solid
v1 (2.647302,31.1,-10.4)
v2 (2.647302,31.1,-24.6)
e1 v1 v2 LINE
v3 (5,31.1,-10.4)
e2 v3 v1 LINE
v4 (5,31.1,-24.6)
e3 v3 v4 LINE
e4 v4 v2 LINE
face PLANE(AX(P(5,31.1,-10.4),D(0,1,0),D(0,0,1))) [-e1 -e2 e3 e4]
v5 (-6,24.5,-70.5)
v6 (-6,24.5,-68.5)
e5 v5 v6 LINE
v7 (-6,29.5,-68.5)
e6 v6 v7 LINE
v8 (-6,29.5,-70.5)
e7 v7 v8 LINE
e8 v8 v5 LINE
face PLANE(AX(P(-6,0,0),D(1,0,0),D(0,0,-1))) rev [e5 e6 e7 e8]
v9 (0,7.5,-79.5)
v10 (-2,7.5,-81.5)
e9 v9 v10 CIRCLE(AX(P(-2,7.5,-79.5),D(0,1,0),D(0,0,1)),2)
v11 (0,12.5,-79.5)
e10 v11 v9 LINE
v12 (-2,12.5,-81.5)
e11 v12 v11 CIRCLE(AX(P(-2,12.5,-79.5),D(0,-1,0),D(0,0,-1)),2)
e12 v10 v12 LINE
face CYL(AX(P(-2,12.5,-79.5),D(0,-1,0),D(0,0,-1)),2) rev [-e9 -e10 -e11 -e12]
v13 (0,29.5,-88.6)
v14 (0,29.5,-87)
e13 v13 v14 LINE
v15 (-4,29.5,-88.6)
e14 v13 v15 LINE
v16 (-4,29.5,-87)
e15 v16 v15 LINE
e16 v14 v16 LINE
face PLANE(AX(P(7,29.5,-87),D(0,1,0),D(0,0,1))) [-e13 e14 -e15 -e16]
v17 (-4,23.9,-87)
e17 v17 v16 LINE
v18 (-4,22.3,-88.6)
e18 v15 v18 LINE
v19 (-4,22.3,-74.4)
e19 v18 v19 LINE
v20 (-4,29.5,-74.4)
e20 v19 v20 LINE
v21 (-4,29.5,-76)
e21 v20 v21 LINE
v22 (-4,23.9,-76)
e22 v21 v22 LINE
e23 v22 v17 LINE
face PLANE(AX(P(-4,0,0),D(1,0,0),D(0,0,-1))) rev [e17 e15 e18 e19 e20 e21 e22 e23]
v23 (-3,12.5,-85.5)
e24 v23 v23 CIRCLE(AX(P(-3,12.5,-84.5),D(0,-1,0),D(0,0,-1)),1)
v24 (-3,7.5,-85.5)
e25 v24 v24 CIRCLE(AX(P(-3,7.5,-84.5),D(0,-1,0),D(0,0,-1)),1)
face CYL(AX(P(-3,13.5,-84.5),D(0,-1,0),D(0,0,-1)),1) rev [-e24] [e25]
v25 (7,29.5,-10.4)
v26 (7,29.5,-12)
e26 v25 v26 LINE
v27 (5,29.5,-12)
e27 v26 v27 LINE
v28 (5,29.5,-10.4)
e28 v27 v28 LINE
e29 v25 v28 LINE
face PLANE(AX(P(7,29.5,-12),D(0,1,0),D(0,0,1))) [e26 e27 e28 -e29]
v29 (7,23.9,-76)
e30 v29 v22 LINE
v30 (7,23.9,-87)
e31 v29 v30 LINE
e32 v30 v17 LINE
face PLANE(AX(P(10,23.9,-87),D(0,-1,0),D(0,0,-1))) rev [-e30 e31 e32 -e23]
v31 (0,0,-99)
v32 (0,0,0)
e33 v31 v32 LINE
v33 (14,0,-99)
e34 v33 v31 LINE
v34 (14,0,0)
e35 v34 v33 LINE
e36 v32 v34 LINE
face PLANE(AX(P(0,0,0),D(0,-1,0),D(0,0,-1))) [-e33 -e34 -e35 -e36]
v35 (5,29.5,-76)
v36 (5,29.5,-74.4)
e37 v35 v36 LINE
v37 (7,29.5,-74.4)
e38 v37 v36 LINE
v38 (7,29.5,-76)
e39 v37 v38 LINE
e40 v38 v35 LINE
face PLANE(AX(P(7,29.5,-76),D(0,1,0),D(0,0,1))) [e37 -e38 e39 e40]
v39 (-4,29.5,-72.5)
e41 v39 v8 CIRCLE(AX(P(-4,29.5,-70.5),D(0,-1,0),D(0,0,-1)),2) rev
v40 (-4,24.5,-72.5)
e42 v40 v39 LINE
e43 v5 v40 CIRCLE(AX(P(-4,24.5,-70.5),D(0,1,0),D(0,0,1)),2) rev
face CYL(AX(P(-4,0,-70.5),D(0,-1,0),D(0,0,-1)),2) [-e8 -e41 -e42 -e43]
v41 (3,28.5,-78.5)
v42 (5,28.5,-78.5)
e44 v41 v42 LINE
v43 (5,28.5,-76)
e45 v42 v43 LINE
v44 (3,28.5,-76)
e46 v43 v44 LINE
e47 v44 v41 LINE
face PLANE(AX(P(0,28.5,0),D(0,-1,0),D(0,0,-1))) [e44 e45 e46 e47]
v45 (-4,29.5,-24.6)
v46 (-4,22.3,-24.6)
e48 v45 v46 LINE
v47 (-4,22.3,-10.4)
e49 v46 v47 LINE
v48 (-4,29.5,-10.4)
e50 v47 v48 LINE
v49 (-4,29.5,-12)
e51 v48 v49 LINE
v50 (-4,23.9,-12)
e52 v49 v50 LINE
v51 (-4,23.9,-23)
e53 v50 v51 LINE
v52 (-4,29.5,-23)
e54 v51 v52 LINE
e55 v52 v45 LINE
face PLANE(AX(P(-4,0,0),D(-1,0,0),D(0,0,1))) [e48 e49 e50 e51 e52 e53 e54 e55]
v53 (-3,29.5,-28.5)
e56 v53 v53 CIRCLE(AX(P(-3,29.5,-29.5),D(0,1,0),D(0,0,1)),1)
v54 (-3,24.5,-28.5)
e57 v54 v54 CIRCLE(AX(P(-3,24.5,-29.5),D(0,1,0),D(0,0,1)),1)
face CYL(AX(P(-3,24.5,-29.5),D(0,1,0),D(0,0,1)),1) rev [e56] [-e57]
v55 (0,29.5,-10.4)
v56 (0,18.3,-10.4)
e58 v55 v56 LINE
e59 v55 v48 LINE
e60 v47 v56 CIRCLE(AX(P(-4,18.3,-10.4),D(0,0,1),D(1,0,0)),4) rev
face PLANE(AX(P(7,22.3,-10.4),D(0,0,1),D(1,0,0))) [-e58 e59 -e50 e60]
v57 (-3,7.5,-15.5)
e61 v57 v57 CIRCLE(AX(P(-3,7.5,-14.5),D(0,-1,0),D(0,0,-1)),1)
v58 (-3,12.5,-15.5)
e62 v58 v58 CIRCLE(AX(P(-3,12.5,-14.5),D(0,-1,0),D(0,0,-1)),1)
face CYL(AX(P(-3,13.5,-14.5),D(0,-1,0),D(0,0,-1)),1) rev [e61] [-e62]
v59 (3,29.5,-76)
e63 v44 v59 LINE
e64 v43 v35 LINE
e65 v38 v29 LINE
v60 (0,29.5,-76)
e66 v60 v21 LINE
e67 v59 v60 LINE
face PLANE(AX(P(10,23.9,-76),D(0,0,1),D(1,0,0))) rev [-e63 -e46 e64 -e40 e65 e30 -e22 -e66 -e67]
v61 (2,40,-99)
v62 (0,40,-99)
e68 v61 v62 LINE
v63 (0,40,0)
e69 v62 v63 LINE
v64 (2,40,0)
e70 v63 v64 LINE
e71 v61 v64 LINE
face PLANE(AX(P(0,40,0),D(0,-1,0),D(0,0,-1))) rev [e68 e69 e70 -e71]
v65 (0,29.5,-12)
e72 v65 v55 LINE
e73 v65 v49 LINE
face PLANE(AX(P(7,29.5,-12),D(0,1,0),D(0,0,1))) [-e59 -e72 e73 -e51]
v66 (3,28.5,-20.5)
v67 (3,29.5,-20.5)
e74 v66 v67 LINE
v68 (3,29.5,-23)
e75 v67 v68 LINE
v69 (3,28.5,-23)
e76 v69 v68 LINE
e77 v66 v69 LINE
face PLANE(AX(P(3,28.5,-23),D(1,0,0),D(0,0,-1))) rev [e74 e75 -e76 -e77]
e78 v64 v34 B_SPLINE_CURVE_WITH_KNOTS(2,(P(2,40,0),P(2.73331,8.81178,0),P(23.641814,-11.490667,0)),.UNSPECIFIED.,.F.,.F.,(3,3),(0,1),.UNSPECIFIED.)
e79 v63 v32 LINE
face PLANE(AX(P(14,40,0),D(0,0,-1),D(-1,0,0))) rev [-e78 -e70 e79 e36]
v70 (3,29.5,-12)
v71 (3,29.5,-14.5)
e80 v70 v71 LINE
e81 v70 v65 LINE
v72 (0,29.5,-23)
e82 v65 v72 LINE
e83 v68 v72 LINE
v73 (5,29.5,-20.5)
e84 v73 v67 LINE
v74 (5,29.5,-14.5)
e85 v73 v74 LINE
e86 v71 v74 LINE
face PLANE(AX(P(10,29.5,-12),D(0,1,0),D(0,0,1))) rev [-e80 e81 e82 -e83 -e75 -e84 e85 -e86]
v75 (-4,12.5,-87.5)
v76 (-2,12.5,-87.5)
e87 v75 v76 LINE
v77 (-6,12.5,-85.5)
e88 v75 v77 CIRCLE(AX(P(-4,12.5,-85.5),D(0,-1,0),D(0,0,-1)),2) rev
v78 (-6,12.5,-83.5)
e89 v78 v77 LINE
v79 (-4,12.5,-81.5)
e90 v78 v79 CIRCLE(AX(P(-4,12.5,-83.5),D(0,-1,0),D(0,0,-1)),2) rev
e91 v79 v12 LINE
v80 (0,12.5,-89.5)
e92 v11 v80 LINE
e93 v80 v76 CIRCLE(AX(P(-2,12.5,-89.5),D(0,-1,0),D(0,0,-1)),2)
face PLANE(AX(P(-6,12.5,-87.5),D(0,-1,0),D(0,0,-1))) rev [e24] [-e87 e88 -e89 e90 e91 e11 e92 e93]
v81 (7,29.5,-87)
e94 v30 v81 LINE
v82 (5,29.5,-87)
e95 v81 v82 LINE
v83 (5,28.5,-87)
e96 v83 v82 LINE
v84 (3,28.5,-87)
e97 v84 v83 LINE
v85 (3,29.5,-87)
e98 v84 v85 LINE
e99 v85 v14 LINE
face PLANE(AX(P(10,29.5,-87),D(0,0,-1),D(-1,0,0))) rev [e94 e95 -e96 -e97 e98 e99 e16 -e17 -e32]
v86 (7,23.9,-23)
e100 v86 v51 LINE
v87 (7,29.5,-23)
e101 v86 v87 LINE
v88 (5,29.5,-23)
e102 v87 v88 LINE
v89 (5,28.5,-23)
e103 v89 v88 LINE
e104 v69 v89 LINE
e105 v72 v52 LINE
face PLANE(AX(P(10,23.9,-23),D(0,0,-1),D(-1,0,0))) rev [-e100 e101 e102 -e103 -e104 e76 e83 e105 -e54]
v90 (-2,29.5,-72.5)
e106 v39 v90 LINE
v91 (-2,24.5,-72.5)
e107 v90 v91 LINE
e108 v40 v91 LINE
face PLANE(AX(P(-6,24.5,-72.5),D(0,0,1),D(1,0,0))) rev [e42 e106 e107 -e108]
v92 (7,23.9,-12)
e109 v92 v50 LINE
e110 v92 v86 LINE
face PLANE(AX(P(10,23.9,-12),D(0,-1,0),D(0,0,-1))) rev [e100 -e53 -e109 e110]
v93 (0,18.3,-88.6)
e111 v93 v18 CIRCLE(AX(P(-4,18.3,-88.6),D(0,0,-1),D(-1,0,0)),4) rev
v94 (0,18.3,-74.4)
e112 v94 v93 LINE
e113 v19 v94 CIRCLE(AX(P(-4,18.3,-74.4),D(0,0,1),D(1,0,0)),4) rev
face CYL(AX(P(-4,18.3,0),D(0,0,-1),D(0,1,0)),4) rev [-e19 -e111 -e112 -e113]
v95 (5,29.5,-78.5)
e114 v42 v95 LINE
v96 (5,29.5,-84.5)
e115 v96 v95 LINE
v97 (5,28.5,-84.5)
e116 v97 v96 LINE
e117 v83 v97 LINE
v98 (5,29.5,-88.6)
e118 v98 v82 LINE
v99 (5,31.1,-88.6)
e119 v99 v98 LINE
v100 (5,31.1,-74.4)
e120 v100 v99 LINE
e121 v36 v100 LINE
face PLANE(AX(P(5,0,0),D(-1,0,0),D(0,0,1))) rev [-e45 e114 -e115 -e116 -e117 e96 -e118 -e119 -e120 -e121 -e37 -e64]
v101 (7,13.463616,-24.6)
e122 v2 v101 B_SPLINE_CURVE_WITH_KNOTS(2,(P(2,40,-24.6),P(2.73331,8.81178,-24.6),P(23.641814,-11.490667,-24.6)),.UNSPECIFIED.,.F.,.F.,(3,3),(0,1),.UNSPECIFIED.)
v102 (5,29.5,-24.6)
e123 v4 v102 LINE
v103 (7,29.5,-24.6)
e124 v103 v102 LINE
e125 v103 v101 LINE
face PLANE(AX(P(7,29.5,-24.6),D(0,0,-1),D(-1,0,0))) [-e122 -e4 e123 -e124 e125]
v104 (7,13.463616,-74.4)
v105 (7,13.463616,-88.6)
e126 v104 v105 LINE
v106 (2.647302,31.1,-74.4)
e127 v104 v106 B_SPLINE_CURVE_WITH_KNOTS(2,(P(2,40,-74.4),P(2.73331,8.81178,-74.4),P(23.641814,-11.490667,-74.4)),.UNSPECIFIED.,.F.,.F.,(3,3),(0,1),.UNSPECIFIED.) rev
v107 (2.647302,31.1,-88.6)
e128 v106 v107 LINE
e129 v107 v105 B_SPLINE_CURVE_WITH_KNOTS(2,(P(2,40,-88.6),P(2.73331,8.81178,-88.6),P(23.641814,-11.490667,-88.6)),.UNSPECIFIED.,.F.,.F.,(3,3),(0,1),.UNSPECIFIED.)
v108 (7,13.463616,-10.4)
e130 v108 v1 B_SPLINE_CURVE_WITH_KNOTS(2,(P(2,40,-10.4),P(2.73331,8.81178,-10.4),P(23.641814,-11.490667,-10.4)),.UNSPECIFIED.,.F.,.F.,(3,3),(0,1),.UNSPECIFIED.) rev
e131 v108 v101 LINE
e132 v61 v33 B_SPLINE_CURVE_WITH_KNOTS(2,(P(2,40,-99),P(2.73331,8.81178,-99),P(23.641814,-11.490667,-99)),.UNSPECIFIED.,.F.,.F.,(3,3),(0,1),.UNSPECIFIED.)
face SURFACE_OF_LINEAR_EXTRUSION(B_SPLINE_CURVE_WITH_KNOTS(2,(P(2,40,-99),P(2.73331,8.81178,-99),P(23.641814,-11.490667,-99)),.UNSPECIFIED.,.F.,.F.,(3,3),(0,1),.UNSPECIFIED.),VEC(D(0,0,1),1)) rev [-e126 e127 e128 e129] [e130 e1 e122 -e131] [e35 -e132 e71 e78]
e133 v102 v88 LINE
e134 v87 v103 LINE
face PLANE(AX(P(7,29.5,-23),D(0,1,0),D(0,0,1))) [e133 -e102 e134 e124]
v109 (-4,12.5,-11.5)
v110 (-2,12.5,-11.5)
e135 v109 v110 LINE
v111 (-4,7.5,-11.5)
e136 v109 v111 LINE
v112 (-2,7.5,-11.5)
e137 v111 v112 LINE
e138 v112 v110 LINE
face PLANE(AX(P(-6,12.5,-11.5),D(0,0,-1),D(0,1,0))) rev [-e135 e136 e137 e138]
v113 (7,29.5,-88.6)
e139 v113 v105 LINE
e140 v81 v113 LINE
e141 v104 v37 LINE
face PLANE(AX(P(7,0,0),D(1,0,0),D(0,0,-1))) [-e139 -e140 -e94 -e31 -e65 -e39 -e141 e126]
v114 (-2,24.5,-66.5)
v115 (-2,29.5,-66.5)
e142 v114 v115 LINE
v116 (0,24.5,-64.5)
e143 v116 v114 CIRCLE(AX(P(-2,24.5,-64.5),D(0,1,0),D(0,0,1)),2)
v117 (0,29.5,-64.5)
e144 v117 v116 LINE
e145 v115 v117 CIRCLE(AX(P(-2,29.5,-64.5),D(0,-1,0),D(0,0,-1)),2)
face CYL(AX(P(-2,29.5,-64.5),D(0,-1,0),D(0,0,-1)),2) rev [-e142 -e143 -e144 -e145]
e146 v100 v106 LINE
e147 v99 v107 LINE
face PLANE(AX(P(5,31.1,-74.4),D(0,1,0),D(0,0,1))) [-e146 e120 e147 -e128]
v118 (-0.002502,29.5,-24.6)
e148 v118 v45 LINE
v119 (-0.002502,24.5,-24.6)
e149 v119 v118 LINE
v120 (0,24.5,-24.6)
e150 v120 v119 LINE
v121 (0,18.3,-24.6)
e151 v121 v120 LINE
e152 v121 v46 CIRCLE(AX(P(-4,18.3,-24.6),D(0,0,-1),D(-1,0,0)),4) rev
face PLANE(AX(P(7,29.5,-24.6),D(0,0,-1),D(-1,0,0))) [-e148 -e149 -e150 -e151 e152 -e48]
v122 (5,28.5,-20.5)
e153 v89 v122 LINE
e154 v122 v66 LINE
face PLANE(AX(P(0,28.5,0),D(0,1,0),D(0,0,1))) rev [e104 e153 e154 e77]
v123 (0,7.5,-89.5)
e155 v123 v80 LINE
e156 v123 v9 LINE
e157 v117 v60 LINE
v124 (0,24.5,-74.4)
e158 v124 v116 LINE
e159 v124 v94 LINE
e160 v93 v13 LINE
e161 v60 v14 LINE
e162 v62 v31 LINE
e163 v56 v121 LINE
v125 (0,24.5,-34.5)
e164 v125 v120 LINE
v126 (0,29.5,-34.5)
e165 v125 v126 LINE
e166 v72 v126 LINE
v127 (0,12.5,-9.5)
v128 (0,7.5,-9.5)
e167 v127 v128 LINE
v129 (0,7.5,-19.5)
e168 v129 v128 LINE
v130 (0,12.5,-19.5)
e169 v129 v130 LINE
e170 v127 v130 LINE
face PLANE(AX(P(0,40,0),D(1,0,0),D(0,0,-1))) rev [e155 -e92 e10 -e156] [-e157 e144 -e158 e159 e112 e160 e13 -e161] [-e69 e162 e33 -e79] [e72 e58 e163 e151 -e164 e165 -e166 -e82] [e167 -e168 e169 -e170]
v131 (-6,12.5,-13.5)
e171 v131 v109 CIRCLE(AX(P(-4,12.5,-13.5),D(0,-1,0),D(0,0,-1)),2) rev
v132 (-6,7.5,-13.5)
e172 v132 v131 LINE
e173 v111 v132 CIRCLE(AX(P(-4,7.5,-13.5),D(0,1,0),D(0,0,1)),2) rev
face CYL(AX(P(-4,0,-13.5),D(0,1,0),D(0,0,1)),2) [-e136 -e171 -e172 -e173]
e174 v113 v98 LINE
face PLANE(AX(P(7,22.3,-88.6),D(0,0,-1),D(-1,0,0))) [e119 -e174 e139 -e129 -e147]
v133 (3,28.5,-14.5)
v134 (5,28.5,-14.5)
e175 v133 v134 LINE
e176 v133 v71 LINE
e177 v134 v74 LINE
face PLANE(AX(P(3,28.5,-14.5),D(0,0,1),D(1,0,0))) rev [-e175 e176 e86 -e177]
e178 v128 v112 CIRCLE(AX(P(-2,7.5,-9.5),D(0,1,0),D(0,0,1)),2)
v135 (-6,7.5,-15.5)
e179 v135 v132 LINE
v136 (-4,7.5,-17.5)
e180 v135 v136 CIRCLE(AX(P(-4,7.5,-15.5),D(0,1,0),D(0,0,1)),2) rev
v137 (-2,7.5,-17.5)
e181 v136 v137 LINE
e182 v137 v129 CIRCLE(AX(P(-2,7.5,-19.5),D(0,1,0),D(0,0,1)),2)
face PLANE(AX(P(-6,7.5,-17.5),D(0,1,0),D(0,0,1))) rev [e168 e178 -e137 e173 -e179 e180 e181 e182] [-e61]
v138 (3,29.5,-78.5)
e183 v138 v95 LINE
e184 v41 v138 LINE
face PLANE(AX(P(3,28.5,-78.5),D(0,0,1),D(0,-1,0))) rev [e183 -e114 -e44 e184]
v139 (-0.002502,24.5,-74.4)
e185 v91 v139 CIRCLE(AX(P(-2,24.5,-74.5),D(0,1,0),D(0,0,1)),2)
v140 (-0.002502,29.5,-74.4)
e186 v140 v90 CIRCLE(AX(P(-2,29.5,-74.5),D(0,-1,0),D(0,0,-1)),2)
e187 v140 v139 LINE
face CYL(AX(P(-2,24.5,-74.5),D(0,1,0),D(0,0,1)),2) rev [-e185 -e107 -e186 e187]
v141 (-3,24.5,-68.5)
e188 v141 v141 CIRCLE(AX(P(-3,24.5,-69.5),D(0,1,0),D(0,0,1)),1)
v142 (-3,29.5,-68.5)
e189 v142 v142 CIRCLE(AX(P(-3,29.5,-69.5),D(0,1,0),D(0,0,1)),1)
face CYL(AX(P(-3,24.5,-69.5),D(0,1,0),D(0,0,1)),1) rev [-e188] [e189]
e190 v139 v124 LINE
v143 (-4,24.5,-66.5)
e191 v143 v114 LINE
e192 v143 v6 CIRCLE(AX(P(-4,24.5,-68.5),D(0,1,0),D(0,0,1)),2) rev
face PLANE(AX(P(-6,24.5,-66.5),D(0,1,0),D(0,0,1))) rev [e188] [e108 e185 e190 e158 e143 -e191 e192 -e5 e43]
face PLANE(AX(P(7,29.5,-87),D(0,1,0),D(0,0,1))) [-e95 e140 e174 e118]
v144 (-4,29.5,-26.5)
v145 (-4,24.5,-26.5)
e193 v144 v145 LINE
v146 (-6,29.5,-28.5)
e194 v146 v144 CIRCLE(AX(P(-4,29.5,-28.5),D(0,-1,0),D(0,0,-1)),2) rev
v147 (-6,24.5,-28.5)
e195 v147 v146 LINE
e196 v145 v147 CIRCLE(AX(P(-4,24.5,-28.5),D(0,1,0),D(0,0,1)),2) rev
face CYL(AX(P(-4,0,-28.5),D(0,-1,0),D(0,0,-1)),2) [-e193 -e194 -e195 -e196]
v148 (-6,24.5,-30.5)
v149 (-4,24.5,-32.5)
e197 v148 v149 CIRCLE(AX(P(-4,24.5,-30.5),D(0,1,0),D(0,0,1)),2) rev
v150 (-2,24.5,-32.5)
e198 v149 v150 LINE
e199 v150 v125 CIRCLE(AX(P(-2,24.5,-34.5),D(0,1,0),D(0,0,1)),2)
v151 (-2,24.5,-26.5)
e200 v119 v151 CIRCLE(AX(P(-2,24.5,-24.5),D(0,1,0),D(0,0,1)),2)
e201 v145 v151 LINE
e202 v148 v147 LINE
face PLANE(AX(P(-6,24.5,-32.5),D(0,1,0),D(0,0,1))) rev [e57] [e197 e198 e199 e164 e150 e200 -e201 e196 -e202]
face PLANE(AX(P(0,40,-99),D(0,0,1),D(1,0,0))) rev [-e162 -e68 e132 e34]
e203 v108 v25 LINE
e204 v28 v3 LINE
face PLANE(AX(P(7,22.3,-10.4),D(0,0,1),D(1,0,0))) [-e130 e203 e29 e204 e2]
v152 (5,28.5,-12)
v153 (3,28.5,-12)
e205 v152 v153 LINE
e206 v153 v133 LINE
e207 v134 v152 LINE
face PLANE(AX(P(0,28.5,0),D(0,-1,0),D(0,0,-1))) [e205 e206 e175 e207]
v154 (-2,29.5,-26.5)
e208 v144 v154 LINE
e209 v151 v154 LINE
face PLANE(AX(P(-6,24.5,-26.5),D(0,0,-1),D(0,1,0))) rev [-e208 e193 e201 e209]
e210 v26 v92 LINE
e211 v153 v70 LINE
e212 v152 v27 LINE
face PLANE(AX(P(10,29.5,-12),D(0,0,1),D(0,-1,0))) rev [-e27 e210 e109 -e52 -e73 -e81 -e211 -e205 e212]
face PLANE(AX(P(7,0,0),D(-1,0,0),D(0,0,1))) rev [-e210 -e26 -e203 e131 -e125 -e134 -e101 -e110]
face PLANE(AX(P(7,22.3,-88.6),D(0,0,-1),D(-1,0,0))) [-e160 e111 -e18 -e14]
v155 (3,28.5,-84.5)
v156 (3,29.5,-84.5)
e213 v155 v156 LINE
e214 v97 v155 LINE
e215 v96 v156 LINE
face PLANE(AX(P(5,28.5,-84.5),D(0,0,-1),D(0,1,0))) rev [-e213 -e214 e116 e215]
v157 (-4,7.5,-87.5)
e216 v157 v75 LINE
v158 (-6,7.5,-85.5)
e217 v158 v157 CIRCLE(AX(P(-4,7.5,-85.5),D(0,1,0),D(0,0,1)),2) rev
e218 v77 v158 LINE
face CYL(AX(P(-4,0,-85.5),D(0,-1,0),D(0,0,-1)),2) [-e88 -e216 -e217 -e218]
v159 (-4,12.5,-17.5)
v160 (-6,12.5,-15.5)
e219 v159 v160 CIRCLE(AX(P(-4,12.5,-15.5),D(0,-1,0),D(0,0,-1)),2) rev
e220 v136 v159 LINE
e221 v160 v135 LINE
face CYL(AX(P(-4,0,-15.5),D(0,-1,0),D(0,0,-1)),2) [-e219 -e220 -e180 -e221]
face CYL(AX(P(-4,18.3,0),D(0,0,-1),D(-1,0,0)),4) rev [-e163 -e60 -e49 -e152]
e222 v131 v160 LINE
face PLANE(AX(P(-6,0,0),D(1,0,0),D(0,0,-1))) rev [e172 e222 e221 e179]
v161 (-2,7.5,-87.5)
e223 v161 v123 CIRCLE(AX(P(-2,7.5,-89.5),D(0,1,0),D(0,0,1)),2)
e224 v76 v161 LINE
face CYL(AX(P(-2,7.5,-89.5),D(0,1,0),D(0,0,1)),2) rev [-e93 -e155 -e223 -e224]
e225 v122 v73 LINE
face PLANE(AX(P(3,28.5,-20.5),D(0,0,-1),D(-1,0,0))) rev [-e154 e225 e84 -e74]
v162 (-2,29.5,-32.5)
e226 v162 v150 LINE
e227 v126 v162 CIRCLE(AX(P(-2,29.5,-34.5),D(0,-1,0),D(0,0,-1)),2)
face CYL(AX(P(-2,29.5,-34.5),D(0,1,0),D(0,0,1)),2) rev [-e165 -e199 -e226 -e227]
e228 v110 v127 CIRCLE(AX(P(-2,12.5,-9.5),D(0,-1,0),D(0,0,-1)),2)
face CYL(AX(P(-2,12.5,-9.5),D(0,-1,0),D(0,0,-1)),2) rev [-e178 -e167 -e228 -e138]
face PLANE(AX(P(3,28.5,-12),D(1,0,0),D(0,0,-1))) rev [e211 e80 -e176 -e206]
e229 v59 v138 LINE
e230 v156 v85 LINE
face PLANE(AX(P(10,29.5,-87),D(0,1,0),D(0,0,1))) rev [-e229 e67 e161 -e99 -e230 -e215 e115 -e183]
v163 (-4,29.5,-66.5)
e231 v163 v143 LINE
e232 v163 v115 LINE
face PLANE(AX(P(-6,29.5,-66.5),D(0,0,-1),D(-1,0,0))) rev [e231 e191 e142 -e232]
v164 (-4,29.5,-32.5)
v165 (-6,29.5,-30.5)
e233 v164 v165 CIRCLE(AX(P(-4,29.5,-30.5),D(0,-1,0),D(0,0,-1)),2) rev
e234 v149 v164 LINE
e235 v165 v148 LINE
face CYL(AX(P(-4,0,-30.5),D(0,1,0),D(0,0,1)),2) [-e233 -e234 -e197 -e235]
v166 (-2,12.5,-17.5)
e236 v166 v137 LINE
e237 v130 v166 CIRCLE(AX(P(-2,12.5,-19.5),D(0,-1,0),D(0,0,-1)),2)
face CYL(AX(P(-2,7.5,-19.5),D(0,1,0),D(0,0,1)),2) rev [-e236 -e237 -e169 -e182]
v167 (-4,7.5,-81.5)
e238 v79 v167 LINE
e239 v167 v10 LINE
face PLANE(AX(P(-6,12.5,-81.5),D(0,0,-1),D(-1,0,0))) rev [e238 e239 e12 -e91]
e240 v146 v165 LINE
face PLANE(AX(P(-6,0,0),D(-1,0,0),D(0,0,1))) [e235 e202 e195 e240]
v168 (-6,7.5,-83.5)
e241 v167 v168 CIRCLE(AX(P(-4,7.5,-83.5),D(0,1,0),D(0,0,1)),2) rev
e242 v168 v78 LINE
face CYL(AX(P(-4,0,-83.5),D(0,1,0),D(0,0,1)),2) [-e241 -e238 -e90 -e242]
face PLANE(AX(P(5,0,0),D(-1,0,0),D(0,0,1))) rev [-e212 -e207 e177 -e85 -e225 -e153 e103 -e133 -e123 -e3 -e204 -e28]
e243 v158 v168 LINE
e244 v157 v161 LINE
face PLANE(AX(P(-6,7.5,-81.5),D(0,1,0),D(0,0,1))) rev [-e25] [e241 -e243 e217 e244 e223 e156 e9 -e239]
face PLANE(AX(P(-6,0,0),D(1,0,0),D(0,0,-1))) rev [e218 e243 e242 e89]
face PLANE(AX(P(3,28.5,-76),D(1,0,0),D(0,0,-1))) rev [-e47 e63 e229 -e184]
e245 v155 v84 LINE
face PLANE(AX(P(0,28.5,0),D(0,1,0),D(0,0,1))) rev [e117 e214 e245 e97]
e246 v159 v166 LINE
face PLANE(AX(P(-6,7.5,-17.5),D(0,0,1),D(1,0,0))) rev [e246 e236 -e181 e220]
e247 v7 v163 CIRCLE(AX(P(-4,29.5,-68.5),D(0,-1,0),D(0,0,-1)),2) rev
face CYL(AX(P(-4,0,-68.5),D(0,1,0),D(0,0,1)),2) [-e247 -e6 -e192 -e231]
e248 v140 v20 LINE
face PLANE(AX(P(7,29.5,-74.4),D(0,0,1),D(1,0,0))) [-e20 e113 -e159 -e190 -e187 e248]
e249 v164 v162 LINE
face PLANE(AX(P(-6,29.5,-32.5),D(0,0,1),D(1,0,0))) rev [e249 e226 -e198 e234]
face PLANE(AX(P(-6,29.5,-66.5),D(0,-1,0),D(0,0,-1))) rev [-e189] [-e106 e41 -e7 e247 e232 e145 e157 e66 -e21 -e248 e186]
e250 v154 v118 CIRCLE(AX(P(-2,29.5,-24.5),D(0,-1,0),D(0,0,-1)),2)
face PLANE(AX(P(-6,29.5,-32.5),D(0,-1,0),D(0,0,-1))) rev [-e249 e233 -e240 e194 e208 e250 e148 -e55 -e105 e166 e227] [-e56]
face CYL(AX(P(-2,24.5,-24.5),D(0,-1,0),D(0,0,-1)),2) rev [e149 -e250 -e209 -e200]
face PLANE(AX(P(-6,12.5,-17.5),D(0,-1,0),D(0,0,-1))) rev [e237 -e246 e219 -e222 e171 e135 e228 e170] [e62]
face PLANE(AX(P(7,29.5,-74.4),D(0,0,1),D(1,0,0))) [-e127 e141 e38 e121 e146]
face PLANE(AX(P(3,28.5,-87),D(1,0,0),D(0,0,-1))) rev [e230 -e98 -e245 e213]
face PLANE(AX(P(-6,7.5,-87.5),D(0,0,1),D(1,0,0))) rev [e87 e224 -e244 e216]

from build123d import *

# Parameters (mm, degrees)
SKETCH1_W                = 14
SKETCH1_H                = 99
BOSS_EXTRUDE1_DEPTH      = 40
CUT_EXTRUDE1_DEPTH       = 108.689368092
SKETCH3_W                = 6
SKETCH3_H                = 5
BOSS_EXTRUDE2_DEPTH      = 6
SKETCH4_R                = 1
CUT_EXTRUDE2_DEPTH       = 6
SKETCH5_R                = 1
CUT_EXTRUDE3_DEPTH       = 6
FILLET1_R                = 2
SKETCH6_W                = 6
SKETCH6_H                = 5
BOSS_EXTRUDE3_DEPTH      = 6
SKETCH7_R                = 1
CUT_EXTRUDE4_DEPTH       = 5
SKETCH8_R                = 1
CUT_EXTRUDE5_DEPTH       = 5
FILLET2_R                = 2
SKETCH9_W                = 11
SKETCH9_H                = 5.6
CUT_EXTRUDE6_DEPTH       = 10
BOSS_EXTRUDE4_DEPTH      = 4
BOSS_EXTRUDE4_DEPTH_BACK = 7
FILLET4_R                = 4
SKETCH11_W               = 14.2
SKETCH11_H               = 1.6
BOSS_EXTRUDE5_DEPTH      = 5
SKETCH12_W               = 2
SKETCH12_H               = 2.5
BOSS_EXTRUDE6_DEPTH      = 1
SKETCH13_W               = 2
SKETCH13_H               = 2.5
BOSS_EXTRUDE7_DEPTH      = 1
BOSS_EXTRUDE8_DEPTH      = 10
BOSS_EXTRUDE9_DEPTH      = 10


with BuildPart() as part:
    # Sketch1 → Boss-Extrude1 (new body)
    with BuildSketch(Plane(origin=(0, 0, 0), x_dir=(1, 0, 0), z_dir=(0, 1, 0))):
        with Locations((7, 49.5)):
            Rectangle(SKETCH1_W, SKETCH1_H)
    extrude(amount=BOSS_EXTRUDE1_DEPTH)

    # Sketch2 → Cut-Extrude1 (cut, through all)
    with BuildSketch(Plane.XY):
        with BuildLine():
            Line((14, 0), (14, 40))
            Line((14, 40), (2, 40))
            add(Edge.make_bspline(
                [(2, 40), (2.539521764, 17.05373231), (14, 0)],
                knots=[0, 0, 0, 0.735735095, 0.735735095, 0.735735095], degree=2))
        make_face()
    extrude(amount=-CUT_EXTRUDE1_DEPTH, mode=Mode.SUBTRACT)

    # Sketch3 → Boss-Extrude2 (add)
    with BuildSketch(Plane.ZY):
        with Locations((-84.5, 10)):
            Rectangle(SKETCH3_W, SKETCH3_H)
        with Locations((-14.5, 10)):
            Rectangle(SKETCH3_W, SKETCH3_H)
    extrude(amount=BOSS_EXTRUDE2_DEPTH)

    # Sketch4 → Cut-Extrude2 (cut)
    with BuildSketch(Plane.XZ.offset(-7.5)):
        with Locations(Location((-3, -84.5, 0), (0, 0, 270))):
            Circle(SKETCH4_R)
    extrude(amount=-CUT_EXTRUDE2_DEPTH, mode=Mode.SUBTRACT)

    # Sketch5 → Cut-Extrude3 (cut)
    with BuildSketch(Plane.XZ.offset(-7.5)):
        with Locations(Location((-3, -14.5, 0), (0, 0, 270))):
            Circle(SKETCH5_R)
    extrude(amount=-CUT_EXTRUDE3_DEPTH, mode=Mode.SUBTRACT)

    # Fillet1
    fillet1_edges = [part.edges().sort_by_distance(p)[0] for p in [
        (0, 10, -81.5),
        (0, 10, -87.5),
        (-6, 10, -81.5),
        (-6, 10, -87.5),
        (0, 10, -17.5),
        (0, 10, -11.5),
        (-6, 10, -17.5),
        (-6, 10, -11.5),
    ]]
    fillet(fillet1_edges, radius=FILLET1_R)

    # Sketch6 → Boss-Extrude3 (add)
    with BuildSketch(Plane.ZY):
        with Locations((-69.5, 27)):
            Rectangle(SKETCH6_W, SKETCH6_H)
        with Locations((-29.5, 27)):
            Rectangle(SKETCH6_W, SKETCH6_H)
    extrude(amount=BOSS_EXTRUDE3_DEPTH)

    # Sketch7 → Cut-Extrude4 (cut)
    with BuildSketch(Plane(origin=(0, 29.5, 0), x_dir=(1, 0, 0), z_dir=(0, 1, 0))):
        with Locations(Location((-3, 69.5, 0), (0, 0, 270))):
            Circle(SKETCH7_R)
    extrude(amount=-CUT_EXTRUDE4_DEPTH, mode=Mode.SUBTRACT)

    # Sketch8 → Cut-Extrude5 (cut)
    with BuildSketch(Plane(origin=(0, 29.5, 0), x_dir=(1, 0, 0), z_dir=(0, 1, 0))):
        with Locations(Location((-3, 29.5, 0), (0, 0, 270))):
            Circle(SKETCH8_R)
    extrude(amount=-CUT_EXTRUDE5_DEPTH, mode=Mode.SUBTRACT)

    # Fillet2
    fillet2_edges = [part.edges().sort_by_distance(p)[0] for p in [
        (0, 27, -66.5),
        (0, 27, -72.5),
        (-6, 27, -66.5),
        (-6, 27, -72.5),
        (0, 27, -32.5),
        (0, 27, -26.5),
        (-6, 27, -32.5),
        (-6, 27, -26.5),
    ]]
    fillet(fillet2_edges, radius=FILLET2_R)

    # Sketch9 → Cut-Extrude6 (cut)
    with BuildSketch(Plane.ZY):
        with Locations((-81.5, 26.7)):
            Rectangle(SKETCH9_W, SKETCH9_H)
        with Locations((-17.5, 26.7)):
            Rectangle(SKETCH9_W, SKETCH9_H)
    extrude(amount=-CUT_EXTRUDE6_DEPTH, mode=Mode.SUBTRACT)

    # Sketch10 → Boss-Extrude4 (add, two sides: drawn at the far end of the back side and taken through both)
    with BuildSketch(Plane.ZY.offset(-BOSS_EXTRUDE4_DEPTH_BACK)):
        Polygon((-76, 29.5), (-74.4, 29.5), (-74.4, 22.3), (-76, 22.3), (-88.6, 22.3), (-88.6, 29.5), (-87, 29.5), (-87, 23.9), (-76, 23.9), align=None)
        Polygon((-23, 29.5), (-24.6, 29.5), (-24.6, 22.3), (-23, 22.3), (-10.4, 22.3), (-10.4, 29.5), (-12, 29.5), (-12, 23.9), (-23, 23.9), align=None)
    extrude(amount=BOSS_EXTRUDE4_DEPTH + BOSS_EXTRUDE4_DEPTH_BACK)

    # Fillet4
    fillet4_edges = [part.edges().sort_by_distance(p)[0] for p in [
        (0, 22.3, -81.5),
        (0, 22.3, -17.5),
    ]]
    fillet(fillet4_edges, radius=FILLET4_R - 0.0001)  # a hair under: the kernel refuses the full size

    # Sketch11 → Boss-Extrude5 (add)
    with BuildSketch(Plane.ZY):
        with Locations((-81.5, 30.3)):
            Rectangle(SKETCH11_W, SKETCH11_H)
        with Locations((-17.5, 30.3)):
            Rectangle(SKETCH11_W, SKETCH11_H)
    extrude(amount=-BOSS_EXTRUDE5_DEPTH)

    # Sketch12 → Boss-Extrude6 (add)
    with BuildSketch(Plane.XZ.offset(-29.5)):
        with Locations((4, -77.25)):
            Rectangle(SKETCH12_W, SKETCH12_H)
        with Locations((4, -85.75)):
            Rectangle(SKETCH12_W, SKETCH12_H)
    extrude(amount=BOSS_EXTRUDE6_DEPTH)

    # Sketch13 → Boss-Extrude7 (add)
    with BuildSketch(Plane.XZ.offset(-29.5)):
        with Locations((4, -13.25)):
            Rectangle(SKETCH13_W, SKETCH13_H)
        with Locations((4, -21.75)):
            Rectangle(SKETCH13_W, SKETCH13_H)
    extrude(amount=BOSS_EXTRUDE7_DEPTH)

    # Sketch14 → Boss-Extrude8 (add)
    with BuildSketch(Plane.XZ.offset(-22.3)):
        Polygon((4.247690058, -10.4), (7, -10.4), (7, -24.6), (4.247690059, -24.6), align=None)
    extrude(amount=BOSS_EXTRUDE8_DEPTH)

    # Sketch15 → Boss-Extrude9 (add)
    with BuildSketch(Plane.XZ.offset(-22.3)):
        Polygon((4.247690058, -74.4), (4.247690059, -88.6), (7, -88.6), (7, -74.4), align=None)
    extrude(amount=BOSS_EXTRUDE9_DEPTH)


solid = part.part
